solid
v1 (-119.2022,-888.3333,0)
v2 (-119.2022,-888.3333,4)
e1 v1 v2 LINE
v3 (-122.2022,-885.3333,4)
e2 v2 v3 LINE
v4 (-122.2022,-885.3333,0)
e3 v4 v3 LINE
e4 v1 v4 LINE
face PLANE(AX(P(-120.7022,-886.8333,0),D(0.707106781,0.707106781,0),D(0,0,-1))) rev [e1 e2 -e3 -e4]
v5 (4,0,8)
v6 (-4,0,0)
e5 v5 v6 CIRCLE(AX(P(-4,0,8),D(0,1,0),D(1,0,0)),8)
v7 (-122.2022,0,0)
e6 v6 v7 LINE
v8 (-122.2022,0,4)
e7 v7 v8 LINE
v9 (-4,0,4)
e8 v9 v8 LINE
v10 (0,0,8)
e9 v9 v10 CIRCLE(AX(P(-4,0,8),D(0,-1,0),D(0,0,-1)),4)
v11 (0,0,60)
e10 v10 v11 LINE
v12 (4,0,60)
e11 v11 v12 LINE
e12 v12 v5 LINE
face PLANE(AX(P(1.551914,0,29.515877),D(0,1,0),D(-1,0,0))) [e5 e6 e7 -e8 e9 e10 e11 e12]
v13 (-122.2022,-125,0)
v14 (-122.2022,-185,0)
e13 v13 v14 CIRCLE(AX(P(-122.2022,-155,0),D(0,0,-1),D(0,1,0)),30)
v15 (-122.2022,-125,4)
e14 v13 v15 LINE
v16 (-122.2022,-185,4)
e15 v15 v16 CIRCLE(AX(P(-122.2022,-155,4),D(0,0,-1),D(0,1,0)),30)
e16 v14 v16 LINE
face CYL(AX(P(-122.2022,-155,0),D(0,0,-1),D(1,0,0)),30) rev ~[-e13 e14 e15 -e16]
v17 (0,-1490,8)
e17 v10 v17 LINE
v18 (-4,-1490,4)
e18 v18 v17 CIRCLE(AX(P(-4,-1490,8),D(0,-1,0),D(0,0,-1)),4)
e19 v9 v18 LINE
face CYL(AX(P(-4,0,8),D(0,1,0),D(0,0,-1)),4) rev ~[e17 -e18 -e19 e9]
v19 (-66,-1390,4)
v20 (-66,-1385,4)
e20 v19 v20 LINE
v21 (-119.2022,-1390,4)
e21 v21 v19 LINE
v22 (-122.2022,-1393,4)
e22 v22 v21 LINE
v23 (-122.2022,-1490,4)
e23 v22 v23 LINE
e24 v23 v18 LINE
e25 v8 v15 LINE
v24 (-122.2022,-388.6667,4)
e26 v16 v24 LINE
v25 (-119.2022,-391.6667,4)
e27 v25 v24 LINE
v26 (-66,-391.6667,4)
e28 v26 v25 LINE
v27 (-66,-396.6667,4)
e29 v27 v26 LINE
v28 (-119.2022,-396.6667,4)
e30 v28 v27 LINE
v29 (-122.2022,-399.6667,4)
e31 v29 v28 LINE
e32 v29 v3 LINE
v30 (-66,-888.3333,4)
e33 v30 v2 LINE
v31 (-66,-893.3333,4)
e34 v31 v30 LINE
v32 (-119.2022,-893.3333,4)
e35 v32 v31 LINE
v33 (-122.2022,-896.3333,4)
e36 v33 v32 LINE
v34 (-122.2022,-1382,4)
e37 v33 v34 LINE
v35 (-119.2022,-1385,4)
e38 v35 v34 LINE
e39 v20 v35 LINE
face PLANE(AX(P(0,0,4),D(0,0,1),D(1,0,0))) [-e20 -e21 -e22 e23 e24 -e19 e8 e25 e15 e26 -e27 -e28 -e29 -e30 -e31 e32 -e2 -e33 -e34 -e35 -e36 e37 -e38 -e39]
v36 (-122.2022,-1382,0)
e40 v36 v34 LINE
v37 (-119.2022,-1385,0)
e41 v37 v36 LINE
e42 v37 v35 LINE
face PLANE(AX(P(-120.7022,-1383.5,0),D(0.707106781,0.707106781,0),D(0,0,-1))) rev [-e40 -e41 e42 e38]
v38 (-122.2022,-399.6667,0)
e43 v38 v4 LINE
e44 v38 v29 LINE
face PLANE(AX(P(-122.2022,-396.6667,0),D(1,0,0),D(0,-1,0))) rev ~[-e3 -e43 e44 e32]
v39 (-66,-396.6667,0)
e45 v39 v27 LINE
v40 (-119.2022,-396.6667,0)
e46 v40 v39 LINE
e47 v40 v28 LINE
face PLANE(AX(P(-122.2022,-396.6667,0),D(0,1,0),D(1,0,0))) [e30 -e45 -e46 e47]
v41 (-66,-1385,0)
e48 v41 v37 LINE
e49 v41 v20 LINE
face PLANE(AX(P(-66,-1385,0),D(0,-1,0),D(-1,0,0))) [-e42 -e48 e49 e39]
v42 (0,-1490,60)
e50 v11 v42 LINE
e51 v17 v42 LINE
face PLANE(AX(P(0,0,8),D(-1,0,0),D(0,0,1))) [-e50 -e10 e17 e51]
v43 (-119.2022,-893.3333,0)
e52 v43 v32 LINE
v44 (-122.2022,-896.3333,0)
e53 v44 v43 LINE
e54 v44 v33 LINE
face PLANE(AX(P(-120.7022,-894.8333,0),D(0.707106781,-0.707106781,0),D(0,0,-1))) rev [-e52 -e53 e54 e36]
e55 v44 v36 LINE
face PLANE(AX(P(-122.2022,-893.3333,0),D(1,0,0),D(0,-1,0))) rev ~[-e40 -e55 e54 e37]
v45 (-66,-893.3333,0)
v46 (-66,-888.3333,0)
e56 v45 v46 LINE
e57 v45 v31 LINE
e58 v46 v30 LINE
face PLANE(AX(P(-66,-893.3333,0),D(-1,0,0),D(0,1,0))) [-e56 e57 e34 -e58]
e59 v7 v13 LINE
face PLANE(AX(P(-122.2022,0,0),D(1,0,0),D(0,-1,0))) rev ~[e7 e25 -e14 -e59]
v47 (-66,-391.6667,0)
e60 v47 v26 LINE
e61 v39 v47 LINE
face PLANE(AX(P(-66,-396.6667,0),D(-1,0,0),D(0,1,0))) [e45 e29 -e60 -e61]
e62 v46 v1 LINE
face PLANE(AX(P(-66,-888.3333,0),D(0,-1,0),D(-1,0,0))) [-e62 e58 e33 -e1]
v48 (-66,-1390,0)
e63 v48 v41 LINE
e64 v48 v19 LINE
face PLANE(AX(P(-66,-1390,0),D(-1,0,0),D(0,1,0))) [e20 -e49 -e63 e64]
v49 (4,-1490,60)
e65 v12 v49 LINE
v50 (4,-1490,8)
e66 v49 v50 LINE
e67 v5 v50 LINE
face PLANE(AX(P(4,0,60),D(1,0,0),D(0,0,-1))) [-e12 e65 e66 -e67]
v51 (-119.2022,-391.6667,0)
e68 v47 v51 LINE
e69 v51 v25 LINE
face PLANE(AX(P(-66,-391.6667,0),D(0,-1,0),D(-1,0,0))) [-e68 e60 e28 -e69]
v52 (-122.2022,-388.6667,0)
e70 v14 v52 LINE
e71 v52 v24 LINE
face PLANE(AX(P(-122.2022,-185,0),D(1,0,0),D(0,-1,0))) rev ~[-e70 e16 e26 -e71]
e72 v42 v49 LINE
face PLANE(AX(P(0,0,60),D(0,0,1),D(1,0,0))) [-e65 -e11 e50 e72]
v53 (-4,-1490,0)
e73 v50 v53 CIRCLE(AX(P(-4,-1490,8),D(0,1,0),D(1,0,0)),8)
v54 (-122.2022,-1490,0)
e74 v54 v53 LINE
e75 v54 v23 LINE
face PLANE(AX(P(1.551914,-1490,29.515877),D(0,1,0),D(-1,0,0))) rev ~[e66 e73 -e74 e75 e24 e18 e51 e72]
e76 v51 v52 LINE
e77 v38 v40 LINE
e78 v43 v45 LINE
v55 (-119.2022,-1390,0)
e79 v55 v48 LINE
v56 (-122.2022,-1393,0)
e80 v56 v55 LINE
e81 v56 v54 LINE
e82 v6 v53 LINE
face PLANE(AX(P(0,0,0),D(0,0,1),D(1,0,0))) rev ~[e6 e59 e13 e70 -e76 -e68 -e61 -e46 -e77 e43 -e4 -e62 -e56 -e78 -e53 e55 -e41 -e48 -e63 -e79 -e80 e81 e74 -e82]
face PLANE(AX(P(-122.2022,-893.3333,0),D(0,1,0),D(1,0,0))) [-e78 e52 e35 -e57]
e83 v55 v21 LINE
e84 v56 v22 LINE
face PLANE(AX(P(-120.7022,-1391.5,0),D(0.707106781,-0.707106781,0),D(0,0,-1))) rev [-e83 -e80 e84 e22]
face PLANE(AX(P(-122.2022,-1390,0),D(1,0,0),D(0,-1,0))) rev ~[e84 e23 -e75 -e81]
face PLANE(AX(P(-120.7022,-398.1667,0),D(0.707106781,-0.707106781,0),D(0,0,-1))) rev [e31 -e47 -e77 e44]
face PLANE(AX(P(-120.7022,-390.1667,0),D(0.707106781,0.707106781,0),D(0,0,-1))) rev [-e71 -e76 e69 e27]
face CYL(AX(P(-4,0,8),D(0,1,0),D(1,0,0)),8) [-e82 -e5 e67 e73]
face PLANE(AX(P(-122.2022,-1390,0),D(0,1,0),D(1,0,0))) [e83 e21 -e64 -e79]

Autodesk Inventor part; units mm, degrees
ref_plane "YZ Plane" through (0, 0, 0) normal (1, 0, 0) x (0, 1, 0)
ref_plane "XZ Plane" through (0, 0, 0) normal (0, 1, 0) x (-1, 0, 0)
ref_plane "XY Plane" through (0, 0, 0) normal (0, 0, 1) x (1, 0, 0)
sketch "Sketch1" plane through (0, 0, 0) normal (0, 0, 1) x (1, 0, 0)
  line L0 (0, 0) -> (-122.2022, 0)
  line L1 (-122.2022, 0) -> (-122.2022, -1490)
  line L2 (-122.2022, -1490) -> (0, -1490)
  line L3 (0, -1490) -> (0, 0)
  line L4 (-122.2022, -1390) -> (-66, -1390)
  line L5 (-66, -1390) -> (-66, -1385)
  line L6 (-66, -1385) -> (-122.2022, -1385)
  line L7 (-122.2022, -1385) -> (-122.2022, -1390)
  line L8 (-122.2022, -893.3333) -> (-66, -893.3333)
  line L9 (-66, -893.3333) -> (-66, -888.3333)
  line L10 (-66, -888.3333) -> (-122.2022, -888.3333)
  line L11 (-122.2022, -888.3333) -> (-122.2022, -893.3333)
  line L12 (-122.2022, -396.6667) -> (-66, -396.6667)
  line L13 (-66, -396.6667) -> (-66, -391.6667)
  line L14 (-66, -391.6667) -> (-122.2022, -391.6667)
  line L15 (-122.2022, -391.6667) -> (-122.2022, -396.6667)
  circle A0 centre (-122.2022, -155) radius 30
  point P0 (-122.2022, -1385)
  point P1 (-122.2022, -125)
  point P2 (-122.2022, -185)
  dimension "d0" = 1490
  dimension "d1" = 122.2022
  dimension "d2" = 5
  dimension "d4" = 100
  dimension "d7" = 496.6667
  dimension "d23" = 66
  dimension "d28" = 60
  dimension "d29" = 1335
extrude "Plate1" add sketch "Sketch1" along normal blind 4 contours L3 L2 L1 L4 L5 L6 L8 L9 L10 L12 L13 L14 A0 L0
sketch "Sketch2" plane through (4, 0, 0) normal (-1, 0, 0) x (0, -1, 0)
  line L0 (1490, 0) -> (0, 0)
  line L1 (0, 0) -> (0, 60)
  line L2 (0, 60) -> (1490, 60)
  line L3 (1490, 60) -> (1490, 0)
edge flange "Flange1" height 60 angle 90 thickness 4 bend radius 4 thickness toward (-1, 0, 0) relief tear relief width 4 relief depth 2 edges at (0, -745, 4) wall of the first edge with corners at (4, -1490, 0) (4, 0, 0) (4, 0, 60) (4, -1490, 60)
bend "Bend1"
corner "Corner1"
chamfer "Corner Chamfer1" distance 3 angle 45 6 edges at (-122.2022, -1390, 2) (-122.2022, -1385, 2) (-122.2022, -893.3333, 2) (-122.2022, -888.3333, 2) (-122.2022, -391.6667, 2) (-122.2022, -396.6667, 2)
equation "\"d0\" = Стрингер_длина"
equation "\"d1\" = стрингер_глубина_7"
equation "\"d2\" = паз_под_стрингер_толщина"
equation "\"d7\" = 0.333333 * Стрингер_длина"
equation "\"d23\" = паз_под_стрингер_глубина - Thickness"
equation "\"d28\" = 2 * радиус_выреза_под_сварку"
equation "\"d12\" = Thickness"
equation "\"d13\" = BendReliefWidth"
equation "\"d14\" = BendReliefDepth"
equation "\"d15\" = MinimumRemnant"
equation "\"d16\" = TransitionRadius"
equation "\"d17\" = ребро_усилителей"
equation "\"d19\" = BendRadius"
equation "\"d20\" = CornerReliefSize"
equation "\"d21\" = GapSize"
equation "\"d22\" = JacobiRadiusSize"
equation "\"BendRadius\" = Thickness"
equation "\"BendReliefWidth\" = Thickness"
equation "\"BendReliefDepth\" = 0.5 * Thickness"
equation "\"CornerReliefSize\" = 4 * Thickness"
equation "\"MinimumRemnant\" = 2 * Thickness"
equation "\"TransitionRadius\" = BendRadius"
equation "\"JacobiRadiusSize\" = BendRadius"
equation "\"GapSize\" = Thickness"
equation "\"Стрингер_длина\" = 1490"
equation "\"стрингер_глубина_7\" = 122.202218"
equation "\"паз_под_стрингер_толщина\" = 5"
equation "\"паз_под_стрингер_глубина\" = 70"
equation "\"Thickness\" = 4"
equation "\"радиус_выреза_под_сварку\" = 30"
equation "\"ребро_усилителей\" = 60"
properties part number "GBK 1312 stringer 7" material "Steel"
